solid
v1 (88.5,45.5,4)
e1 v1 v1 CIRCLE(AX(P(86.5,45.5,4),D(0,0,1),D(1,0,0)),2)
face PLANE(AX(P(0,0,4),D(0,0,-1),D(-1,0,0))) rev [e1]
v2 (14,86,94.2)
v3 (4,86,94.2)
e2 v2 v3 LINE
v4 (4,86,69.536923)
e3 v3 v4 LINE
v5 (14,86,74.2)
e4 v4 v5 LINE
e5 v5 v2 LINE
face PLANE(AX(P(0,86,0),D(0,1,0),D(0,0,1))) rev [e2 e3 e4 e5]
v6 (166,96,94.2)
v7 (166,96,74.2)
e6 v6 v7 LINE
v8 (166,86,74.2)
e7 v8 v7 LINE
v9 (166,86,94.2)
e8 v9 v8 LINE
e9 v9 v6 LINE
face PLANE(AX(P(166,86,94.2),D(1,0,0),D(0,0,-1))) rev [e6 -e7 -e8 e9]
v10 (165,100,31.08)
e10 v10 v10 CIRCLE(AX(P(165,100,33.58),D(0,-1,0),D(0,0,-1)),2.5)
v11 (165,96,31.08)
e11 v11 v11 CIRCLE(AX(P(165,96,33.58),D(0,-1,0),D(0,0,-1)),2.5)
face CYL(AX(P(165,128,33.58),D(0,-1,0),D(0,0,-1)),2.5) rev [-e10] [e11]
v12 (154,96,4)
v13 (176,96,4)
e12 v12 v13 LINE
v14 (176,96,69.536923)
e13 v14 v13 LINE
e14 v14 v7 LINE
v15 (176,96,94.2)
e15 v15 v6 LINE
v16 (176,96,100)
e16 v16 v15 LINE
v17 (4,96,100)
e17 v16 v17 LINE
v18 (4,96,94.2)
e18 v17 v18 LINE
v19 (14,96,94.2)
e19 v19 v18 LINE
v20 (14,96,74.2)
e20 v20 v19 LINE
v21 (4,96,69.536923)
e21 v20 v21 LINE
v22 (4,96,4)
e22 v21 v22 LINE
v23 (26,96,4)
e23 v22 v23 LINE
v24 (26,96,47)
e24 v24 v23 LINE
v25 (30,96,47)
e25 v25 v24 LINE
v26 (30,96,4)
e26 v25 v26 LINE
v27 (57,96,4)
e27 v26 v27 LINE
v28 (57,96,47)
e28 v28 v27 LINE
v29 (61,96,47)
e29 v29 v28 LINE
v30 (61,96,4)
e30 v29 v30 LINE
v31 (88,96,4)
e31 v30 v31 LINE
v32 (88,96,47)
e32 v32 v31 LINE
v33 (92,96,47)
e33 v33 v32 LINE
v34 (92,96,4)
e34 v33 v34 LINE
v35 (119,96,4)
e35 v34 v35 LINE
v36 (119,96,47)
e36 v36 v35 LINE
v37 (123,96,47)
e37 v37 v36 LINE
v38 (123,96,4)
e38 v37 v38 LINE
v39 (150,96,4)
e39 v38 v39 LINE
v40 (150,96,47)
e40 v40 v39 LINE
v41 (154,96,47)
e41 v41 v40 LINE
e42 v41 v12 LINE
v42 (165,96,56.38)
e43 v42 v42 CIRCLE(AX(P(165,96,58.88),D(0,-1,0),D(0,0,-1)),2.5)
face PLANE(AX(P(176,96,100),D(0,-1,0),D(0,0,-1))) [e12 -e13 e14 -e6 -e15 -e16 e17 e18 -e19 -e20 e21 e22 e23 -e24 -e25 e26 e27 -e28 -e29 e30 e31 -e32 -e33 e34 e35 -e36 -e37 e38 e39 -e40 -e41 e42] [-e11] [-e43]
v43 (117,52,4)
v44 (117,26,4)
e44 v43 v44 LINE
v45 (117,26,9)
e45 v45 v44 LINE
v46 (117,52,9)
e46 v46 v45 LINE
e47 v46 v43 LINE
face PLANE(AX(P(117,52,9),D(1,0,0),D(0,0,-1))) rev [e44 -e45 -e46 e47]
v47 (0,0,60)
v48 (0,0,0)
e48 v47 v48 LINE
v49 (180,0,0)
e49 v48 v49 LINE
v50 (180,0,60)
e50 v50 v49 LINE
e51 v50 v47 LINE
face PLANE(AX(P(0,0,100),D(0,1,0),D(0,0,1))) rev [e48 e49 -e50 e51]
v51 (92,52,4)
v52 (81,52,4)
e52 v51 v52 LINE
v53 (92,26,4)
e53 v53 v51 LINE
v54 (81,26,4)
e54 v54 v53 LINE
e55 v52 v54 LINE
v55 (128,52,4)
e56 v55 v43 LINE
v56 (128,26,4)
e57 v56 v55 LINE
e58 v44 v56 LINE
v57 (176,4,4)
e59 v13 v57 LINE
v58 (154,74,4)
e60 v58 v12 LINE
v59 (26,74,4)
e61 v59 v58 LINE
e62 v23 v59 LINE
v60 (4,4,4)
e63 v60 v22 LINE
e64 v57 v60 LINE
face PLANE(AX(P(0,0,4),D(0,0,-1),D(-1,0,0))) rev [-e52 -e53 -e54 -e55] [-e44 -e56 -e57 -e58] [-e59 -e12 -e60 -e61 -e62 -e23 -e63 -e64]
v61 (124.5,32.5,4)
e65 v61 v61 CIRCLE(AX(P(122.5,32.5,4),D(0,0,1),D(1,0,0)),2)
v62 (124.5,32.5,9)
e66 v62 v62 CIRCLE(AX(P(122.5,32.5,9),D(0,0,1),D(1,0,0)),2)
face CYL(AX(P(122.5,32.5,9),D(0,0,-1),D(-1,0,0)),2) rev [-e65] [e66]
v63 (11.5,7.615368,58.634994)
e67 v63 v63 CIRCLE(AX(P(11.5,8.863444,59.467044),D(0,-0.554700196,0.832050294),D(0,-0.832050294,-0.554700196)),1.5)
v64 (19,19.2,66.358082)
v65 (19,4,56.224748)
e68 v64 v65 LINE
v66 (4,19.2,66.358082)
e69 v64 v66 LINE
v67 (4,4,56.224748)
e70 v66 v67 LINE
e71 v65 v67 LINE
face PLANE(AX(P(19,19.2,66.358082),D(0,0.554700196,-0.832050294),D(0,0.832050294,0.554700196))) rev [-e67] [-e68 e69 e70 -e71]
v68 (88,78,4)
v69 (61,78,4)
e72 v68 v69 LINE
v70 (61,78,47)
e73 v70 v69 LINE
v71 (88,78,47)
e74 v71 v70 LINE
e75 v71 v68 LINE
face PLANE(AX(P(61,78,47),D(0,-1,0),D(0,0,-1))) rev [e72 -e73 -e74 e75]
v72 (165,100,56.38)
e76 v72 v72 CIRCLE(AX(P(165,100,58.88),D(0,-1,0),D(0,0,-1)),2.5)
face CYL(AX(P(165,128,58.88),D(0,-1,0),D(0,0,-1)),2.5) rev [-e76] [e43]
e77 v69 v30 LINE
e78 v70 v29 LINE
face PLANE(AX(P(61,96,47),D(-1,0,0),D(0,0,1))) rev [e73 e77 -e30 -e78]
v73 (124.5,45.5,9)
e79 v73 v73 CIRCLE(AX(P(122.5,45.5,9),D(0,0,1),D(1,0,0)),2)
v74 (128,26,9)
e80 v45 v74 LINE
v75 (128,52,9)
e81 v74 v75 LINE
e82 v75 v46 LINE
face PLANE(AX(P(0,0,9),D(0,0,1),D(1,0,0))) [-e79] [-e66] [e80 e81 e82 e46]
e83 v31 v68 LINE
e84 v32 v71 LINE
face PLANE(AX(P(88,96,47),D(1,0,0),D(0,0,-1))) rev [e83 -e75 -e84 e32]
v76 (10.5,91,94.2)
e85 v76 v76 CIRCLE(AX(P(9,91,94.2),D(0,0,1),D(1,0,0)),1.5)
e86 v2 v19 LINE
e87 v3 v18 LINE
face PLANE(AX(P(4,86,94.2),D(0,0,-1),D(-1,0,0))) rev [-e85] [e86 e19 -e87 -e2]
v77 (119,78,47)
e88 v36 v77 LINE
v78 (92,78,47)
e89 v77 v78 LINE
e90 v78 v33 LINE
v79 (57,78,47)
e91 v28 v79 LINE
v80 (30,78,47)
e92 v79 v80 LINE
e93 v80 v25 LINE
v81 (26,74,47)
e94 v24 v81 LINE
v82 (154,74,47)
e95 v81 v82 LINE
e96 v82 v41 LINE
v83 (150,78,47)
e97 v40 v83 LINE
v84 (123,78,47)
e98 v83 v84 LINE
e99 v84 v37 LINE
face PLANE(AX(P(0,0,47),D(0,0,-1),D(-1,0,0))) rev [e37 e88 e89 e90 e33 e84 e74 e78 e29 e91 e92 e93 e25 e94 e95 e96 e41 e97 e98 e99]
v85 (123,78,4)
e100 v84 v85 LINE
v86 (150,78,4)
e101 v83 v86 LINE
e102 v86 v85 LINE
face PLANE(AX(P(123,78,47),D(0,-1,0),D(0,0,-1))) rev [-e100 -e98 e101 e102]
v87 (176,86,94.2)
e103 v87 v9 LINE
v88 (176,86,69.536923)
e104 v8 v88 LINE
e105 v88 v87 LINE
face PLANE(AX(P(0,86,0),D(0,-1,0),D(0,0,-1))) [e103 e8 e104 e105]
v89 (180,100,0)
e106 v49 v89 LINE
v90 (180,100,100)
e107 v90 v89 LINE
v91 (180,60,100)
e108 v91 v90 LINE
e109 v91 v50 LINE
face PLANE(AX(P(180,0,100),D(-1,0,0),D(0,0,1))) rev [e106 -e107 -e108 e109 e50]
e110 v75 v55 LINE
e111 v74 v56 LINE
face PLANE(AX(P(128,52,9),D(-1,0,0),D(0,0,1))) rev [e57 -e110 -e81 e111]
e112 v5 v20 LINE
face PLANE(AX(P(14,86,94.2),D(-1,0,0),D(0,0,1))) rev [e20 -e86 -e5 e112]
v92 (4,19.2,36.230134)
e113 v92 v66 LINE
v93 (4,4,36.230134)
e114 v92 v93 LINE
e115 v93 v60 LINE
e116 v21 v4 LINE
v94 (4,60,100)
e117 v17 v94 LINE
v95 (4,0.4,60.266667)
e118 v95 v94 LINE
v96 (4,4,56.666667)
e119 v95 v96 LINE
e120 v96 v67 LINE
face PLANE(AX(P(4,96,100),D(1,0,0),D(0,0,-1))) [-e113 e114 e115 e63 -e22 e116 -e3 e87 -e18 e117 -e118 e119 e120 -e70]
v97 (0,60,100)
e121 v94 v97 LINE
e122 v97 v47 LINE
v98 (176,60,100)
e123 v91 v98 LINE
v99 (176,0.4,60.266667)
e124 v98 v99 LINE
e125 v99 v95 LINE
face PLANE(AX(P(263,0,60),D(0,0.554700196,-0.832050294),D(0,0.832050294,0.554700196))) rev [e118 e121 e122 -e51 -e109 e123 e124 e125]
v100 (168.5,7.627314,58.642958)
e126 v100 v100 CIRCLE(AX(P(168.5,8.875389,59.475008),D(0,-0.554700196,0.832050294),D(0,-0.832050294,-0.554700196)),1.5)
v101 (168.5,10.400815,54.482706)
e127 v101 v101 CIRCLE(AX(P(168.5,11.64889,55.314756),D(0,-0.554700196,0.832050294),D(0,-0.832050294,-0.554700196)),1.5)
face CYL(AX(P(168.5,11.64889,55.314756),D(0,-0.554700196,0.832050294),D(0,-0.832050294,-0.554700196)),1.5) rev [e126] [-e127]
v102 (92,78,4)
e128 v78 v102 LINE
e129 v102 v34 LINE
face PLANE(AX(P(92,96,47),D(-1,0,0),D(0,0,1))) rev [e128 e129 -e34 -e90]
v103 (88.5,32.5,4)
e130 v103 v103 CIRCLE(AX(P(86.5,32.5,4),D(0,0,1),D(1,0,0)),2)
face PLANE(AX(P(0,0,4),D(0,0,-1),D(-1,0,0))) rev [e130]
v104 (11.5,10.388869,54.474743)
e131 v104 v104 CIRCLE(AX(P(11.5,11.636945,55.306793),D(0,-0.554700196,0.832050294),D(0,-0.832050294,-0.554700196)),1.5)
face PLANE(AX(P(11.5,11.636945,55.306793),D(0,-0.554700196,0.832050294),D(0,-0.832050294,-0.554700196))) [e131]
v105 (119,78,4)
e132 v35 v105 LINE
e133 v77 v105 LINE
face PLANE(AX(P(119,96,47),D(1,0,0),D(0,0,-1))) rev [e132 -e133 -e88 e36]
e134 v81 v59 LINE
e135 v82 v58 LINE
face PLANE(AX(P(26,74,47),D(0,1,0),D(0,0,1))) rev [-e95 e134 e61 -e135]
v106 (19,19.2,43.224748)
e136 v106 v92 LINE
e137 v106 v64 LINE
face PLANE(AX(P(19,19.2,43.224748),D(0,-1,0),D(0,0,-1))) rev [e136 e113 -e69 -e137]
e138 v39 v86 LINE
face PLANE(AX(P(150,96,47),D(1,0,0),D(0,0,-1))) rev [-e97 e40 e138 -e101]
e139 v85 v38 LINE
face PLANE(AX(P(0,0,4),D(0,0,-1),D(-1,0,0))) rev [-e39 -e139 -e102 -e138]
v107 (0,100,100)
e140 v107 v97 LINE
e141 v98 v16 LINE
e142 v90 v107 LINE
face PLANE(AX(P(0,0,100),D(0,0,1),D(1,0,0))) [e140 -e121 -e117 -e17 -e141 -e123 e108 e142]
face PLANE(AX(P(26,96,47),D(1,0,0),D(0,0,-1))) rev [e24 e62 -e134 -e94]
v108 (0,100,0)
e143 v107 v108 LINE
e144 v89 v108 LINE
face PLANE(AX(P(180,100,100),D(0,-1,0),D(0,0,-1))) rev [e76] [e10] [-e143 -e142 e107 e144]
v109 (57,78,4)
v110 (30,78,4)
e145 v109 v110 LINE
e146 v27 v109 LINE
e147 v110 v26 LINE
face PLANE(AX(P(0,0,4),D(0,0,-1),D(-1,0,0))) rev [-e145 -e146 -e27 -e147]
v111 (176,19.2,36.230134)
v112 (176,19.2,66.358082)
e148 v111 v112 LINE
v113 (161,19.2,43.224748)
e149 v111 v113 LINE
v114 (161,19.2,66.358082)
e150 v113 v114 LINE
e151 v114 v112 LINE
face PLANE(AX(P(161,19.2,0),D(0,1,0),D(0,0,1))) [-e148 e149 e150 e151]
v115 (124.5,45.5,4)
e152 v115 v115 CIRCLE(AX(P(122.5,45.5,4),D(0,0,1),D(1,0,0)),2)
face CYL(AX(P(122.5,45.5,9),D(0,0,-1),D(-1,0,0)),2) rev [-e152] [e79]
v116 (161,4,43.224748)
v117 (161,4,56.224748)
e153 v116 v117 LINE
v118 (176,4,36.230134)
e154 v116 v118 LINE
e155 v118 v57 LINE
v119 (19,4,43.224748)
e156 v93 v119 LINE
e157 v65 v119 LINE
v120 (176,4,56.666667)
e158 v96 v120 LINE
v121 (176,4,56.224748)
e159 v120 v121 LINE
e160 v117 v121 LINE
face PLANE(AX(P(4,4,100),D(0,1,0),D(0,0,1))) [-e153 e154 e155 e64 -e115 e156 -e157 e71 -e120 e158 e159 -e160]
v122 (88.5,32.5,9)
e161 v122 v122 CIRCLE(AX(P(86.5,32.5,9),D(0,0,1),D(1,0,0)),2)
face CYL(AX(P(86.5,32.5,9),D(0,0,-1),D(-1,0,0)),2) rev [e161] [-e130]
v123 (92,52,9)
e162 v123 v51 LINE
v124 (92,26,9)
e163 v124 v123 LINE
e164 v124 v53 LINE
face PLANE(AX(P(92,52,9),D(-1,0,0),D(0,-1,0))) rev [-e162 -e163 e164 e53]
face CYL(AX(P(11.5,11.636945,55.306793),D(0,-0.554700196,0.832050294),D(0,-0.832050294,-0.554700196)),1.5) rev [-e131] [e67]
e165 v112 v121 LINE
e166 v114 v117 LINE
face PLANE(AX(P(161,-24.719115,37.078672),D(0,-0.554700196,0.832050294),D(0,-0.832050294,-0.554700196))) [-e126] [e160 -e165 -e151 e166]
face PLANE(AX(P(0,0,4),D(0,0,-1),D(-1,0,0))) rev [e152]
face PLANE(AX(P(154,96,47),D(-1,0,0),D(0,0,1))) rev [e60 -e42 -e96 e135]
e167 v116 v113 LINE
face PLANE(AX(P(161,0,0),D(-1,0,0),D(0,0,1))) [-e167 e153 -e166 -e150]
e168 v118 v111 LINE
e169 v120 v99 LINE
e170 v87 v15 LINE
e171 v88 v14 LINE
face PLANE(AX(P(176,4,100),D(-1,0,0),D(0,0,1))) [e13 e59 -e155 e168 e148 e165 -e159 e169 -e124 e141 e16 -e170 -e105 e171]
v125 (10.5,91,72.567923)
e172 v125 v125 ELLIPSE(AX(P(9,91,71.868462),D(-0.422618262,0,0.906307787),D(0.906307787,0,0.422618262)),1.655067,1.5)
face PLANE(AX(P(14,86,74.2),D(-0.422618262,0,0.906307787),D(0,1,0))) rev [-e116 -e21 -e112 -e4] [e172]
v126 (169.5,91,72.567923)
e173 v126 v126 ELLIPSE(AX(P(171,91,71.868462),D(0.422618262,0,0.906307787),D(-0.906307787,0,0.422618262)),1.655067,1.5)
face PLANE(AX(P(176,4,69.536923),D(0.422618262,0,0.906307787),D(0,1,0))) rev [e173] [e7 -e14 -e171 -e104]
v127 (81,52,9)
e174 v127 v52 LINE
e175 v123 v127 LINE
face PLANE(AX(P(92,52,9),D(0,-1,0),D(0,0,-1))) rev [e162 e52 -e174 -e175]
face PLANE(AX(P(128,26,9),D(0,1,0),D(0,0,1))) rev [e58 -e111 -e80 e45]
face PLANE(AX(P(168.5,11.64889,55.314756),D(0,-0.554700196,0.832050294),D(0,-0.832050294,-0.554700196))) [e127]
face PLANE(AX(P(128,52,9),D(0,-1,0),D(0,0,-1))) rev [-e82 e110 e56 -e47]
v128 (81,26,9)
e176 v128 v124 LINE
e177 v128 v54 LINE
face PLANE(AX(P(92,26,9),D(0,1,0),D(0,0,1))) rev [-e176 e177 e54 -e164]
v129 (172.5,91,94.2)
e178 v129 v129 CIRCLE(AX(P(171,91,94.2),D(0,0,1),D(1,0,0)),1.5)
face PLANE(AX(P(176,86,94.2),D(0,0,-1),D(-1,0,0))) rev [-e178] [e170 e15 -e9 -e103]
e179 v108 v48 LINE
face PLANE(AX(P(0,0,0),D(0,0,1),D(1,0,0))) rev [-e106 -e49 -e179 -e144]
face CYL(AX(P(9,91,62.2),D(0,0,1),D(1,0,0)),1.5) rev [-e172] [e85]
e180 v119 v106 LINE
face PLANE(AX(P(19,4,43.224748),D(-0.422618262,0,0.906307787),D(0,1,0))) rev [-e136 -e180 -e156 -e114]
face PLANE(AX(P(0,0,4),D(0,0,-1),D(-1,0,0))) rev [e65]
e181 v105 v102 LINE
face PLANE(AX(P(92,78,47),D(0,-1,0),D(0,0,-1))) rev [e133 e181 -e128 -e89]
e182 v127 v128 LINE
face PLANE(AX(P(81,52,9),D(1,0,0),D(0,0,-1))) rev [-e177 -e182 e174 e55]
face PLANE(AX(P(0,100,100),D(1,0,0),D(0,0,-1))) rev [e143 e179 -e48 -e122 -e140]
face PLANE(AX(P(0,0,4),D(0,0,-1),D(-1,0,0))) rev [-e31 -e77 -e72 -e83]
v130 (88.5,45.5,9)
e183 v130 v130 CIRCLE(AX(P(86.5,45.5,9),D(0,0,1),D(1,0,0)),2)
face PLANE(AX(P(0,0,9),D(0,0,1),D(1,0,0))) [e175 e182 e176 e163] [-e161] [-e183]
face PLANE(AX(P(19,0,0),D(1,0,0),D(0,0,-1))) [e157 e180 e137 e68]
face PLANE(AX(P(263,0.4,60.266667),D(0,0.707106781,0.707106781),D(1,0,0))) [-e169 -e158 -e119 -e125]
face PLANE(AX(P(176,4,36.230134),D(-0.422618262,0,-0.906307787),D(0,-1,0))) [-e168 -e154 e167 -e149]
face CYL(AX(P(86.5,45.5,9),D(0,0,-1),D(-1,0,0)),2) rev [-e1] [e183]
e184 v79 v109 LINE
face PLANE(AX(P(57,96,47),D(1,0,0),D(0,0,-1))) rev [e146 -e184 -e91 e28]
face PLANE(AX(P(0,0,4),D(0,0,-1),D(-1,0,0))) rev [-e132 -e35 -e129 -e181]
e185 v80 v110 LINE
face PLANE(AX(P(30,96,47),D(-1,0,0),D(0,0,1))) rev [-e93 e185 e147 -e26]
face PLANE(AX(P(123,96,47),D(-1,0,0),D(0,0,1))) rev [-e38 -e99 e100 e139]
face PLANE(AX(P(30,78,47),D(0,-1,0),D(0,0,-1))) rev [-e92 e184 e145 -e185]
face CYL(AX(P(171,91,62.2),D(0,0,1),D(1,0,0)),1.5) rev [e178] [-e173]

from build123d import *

# Parameters (mm, degrees)
ESBO_O1_W                = 180
ESBO_O1_H                = 100
ESBO_O1_W_2              = 172
ESBO_O1_H_2              = 92
RESSALTO_EXTRUS_O1_DEPTH = 100
ESBO_O2_W                = 180
ESBO_O2_H                = 100
RESSALTO_EXTRUS_O2_DEPTH = 4
RESSALTO_EXTRUS_O3_DEPTH = 43
CORTE_EXTRUS_O1_DEPTH    = 263
CHANFRO1_SIZE            = 6
CHANFRO1_SIZE2           = 4.326661531
ESBO_O5_W                = 10
ESBO_O5_H                = 20
RESSALTO_EXTRUS_O4_DEPTH = 10
ESBO_O6_R                = 1.5
CORTE_EXTRUS_O2_DEPTH    = 32
ESBO_O7_R                = 2.5
CORTE_EXTRUS_O3_DEPTH    = 32
CHANFRO3_SIZE            = 4.663076582
CHANFRO3_SIZE_2          = 10
CHANFRO4_SIZE            = 10
CHANFRO4_SIZE_2          = 4.663076582
RESSALTO_EXTRUS_O5_DEPTH = 15
RESSALTO_EXTRUS_O6_DEPTH = 15
CHANFRO5_SIZE2           = 15
CHANFRO5_SIZE            = 6.994614872
CHANFRO6_SIZE2           = 15
CHANFRO6_SIZE            = 6.994614872
ESBO_O10_R               = 1.5
CORTE_EXTRUS_O4_DEPTH    = 5
ESBO_O11_W               = 11
ESBO_O11_H               = 26
ESBO_O11_R               = 2
RESSALTO_EXTRUS_O7_DEPTH = 5


# Some blends are built 0.0001 mm under size
with BuildPart() as part:
    # Esboço1 → Ressalto-extrusão1 (new body)
    with BuildSketch(Plane.XY):
        with Locations((90, 50)):
            Rectangle(ESBO_O1_W, ESBO_O1_H)
        with Locations((90, 50)):
            Rectangle(ESBO_O1_W_2, ESBO_O1_H_2, mode=Mode.SUBTRACT)
    extrude(amount=RESSALTO_EXTRUS_O1_DEPTH)

    # Esboço2 → Ressalto-extrusão2 (add)
    with BuildSketch(Plane(origin=(0, 0, 0), x_dir=(-1, 0, 0), z_dir=(0, 0, -1))):
        with Locations((-90, 50)):
            Rectangle(ESBO_O2_W, ESBO_O2_H)
    extrude(amount=-RESSALTO_EXTRUS_O2_DEPTH)

    # Esboço3 → Ressalto-extrusão3 (add)
    with BuildSketch(Plane.XY.offset(4)):
        Polygon((30, 96), (30, 78), (57, 78), (57, 96), (61, 96), (61, 78), (88, 78), (88, 96), (92, 96), (92, 78), (119, 78), (119, 96), (123, 96), (123, 78), (150, 78), (150, 96), (154, 96), (154, 74), (26, 74), (26, 96), align=None)
    extrude(amount=RESSALTO_EXTRUS_O3_DEPTH)

    # Esboço4 → Corte-extrusão1 (cut)
    with BuildSketch(Plane.ZY):
        Polygon((60, 0), (100, 60), (100, 0), align=None)
    extrude(amount=-CORTE_EXTRUS_O1_DEPTH, mode=Mode.SUBTRACT)

    # Chanfro1
    chanfro1_edges = [part.edges().sort_by_distance(p)[0] for p in [
        (90, 4, 62.666666667),
    ]]
    chanfro1_side = [part.faces().sort_by_distance(p)[0] for p in [
        (90, 4, 33.333333333),
    ]]
    chamfer(chanfro1_edges, length=CHANFRO1_SIZE, length2=CHANFRO1_SIZE2, reference=chanfro1_side[0])

    # Esboço5 → Ressalto-extrusão4 (add)
    with BuildSketch(Plane.XZ.offset(-96)):
        with Locations((9, 84.2)):
            Rectangle(ESBO_O5_W, ESBO_O5_H)
        with Locations((171, 84.2)):
            Rectangle(ESBO_O5_W, ESBO_O5_H)
    extrude(amount=RESSALTO_EXTRUS_O4_DEPTH)

    # Esboço6 → Corte-extrusão2 (cut)
    with BuildSketch(Plane.XY.offset(94.2)):
        with Locations((171, 91)):
            Circle(ESBO_O6_R)
        with Locations((9, 91)):
            Circle(ESBO_O6_R)
    extrude(amount=-CORTE_EXTRUS_O2_DEPTH, mode=Mode.SUBTRACT)

    # Esboço7 → Corte-extrusão3 (cut)
    with BuildSketch(Plane.XZ.offset(-96)):
        with Locations(Location((165, 58.88, 0), (0, 0, 270))):
            Circle(ESBO_O7_R)
        with Locations(Location((165, 33.58, 0), (0, 0, 270))):
            Circle(ESBO_O7_R)
    extrude(amount=-CORTE_EXTRUS_O3_DEPTH, mode=Mode.SUBTRACT)

    # Chanfro3
    # the kernel refuses this chamfer: 10, 4.663076582 mm, written as the material it adds along each edge
    with BuildSketch(Plane(origin=(176, 96, 74.2), x_dir=(0.07481330637059742, 0, -0.9971975577536776), z_dir=(0, -1, 0))) as chanfro3_piece_1_section:
        Polygon((CHANFRO3_SIZE * 0.997197557657, -CHANFRO3_SIZE * 0.0748133063634), (-CHANFRO3_SIZE_2 * 0.0748133063706, -CHANFRO3_SIZE_2 * 0.997197557754), (0, 0), align=None)
    chanfro3_piece_1 = extrude(amount=10, mode=Mode.PRIVATE)
    chanfro3_piece_1 = split(chanfro3_piece_1, bisect_by=Plane(origin=(166, 91.000000816, 72.695597538), z_dir=(1, 0, 0)), keep=Keep.TOP, mode=Mode.PRIVATE)
    chanfro3_piece_1 = chanfro3_piece_1 - Plane(origin=(171, 91, 72.695597538), x_dir=(1, 0, 0), z_dir=(0, 0, 1)) * Cylinder(1.5, 60, mode=Mode.PRIVATE)
    add(chanfro3_piece_1)

    # Chanfro4
    # the kernel refuses this chamfer: 10, 4.663076582 mm, written as the material it adds along each edge
    with BuildSketch(Plane(origin=(4, 96, 74.2), x_dir=(0.9998669641130704, 0, 0.01631116413111014), z_dir=(0, -1, 0))) as chanfro4_piece_1_section:
        Polygon((CHANFRO4_SIZE * 0.999866964113, -CHANFRO4_SIZE * 0.0163111641311), (-CHANFRO4_SIZE_2 * 0.0163111641295, -CHANFRO4_SIZE_2 * 0.999866964017), (0, 0), align=None)
    chanfro4_piece_1 = extrude(amount=10, mode=Mode.PRIVATE)
    chanfro4_piece_1 = chanfro4_piece_1 - Plane(origin=(9, 91, 72.695597727), x_dir=(1, 0, 0), z_dir=(0, 0, 1)) * Cylinder(1.5, 60, mode=Mode.PRIVATE)
    chanfro4_piece_1 = split(chanfro4_piece_1, bisect_by=Plane(origin=(14, 91.000000829, 72.695597727), z_dir=(-1, 0, 0)), keep=Keep.TOP, mode=Mode.PRIVATE)
    add(chanfro4_piece_1)

    # Esboço8 → Ressalto-extrusão5 (add)
    with BuildSketch(Plane.ZY.offset(-176)):
        Polygon((56.224748388, 4), (66.358081721, 19.2), (43.224748388, 19.2), (43.224748388, 4), align=None)
    extrude(amount=RESSALTO_EXTRUS_O5_DEPTH)

    # Esboço9 → Ressalto-extrusão6 (add)
    with BuildSketch(Plane(origin=(4, 0, 0), x_dir=(0, 0, -1), z_dir=(1, 0, 0))):
        Polygon((-43.224748388, 19.2), (-66.358081721, 19.2), (-56.224748388, 4), (-43.224748388, 4), align=None)
    extrude(amount=RESSALTO_EXTRUS_O6_DEPTH)

    # Chanfro5
    chanfro5_edges = [part.edges().sort_by_distance(p)[0] for p in [
        (176, 11.6, 43.224748388),
    ]]
    chanfro5_side = [part.faces().sort_by_distance(p)[0] for p in [
        (176, 11.6, 43.08485609),
    ]]
    chamfer(chanfro5_edges, length=CHANFRO5_SIZE - 0.0001, length2=CHANFRO5_SIZE2 - 0.0001, reference=chanfro5_side[0])  # a hair under: the kernel refuses the full size

    # Chanfro6
    chanfro6_edges = [part.edges().sort_by_distance(p)[0] for p in [
        (4, 11.6, 43.224748388),
    ]]
    chanfro6_side = [part.faces().sort_by_distance(p)[0] for p in [
        (4, 11.6, 43.08485609),
    ]]
    chamfer(chanfro6_edges, length=CHANFRO6_SIZE - 0.0001, length2=CHANFRO6_SIZE2 - 0.0001, reference=chanfro6_side[0])  # a hair under: the kernel refuses the full size

    # Esboço10 → Corte-extrusão4 (cut)
    with BuildSketch(Plane(origin=(0, -24.719114641, 37.078671961), x_dir=(1, 0, 0), z_dir=(0, -0.5547001962252299, 0.8320502943378433))):
        with Locations(Location((11.5, 40.361212297, 0), (0, 0, 270))):
            Circle(ESBO_O10_R)
        with Locations(Location((168.5, 40.375568889, 0), (0, 0, 270))):
            Circle(ESBO_O10_R)
    extrude(amount=-CORTE_EXTRUS_O4_DEPTH, mode=Mode.SUBTRACT)

    # Esboço11 → Ressalto-extrusão7 (add)
    # profile 1 of 2: a face of its own
    with BuildSketch(Plane.XY.offset(4)):
        with Locations((122.5, 39)):
            Rectangle(ESBO_O11_W, ESBO_O11_H)
        with Locations((122.5, 45.5)):
            Circle(ESBO_O11_R, mode=Mode.SUBTRACT)
        with Locations((122.5, 32.5)):
            Circle(ESBO_O11_R, mode=Mode.SUBTRACT)
    # profile 2 of 2: a face of its own
    with BuildSketch(Plane.XY.offset(4)):
        with Locations((86.5, 39)):
            Rectangle(ESBO_O11_W, ESBO_O11_H)
        with Locations((86.5, 45.5)):
            Circle(ESBO_O11_R, mode=Mode.SUBTRACT)
        with Locations((86.5, 32.5)):
            Circle(ESBO_O11_R, mode=Mode.SUBTRACT)
    extrude(amount=RESSALTO_EXTRUS_O7_DEPTH)


solid = part.part
